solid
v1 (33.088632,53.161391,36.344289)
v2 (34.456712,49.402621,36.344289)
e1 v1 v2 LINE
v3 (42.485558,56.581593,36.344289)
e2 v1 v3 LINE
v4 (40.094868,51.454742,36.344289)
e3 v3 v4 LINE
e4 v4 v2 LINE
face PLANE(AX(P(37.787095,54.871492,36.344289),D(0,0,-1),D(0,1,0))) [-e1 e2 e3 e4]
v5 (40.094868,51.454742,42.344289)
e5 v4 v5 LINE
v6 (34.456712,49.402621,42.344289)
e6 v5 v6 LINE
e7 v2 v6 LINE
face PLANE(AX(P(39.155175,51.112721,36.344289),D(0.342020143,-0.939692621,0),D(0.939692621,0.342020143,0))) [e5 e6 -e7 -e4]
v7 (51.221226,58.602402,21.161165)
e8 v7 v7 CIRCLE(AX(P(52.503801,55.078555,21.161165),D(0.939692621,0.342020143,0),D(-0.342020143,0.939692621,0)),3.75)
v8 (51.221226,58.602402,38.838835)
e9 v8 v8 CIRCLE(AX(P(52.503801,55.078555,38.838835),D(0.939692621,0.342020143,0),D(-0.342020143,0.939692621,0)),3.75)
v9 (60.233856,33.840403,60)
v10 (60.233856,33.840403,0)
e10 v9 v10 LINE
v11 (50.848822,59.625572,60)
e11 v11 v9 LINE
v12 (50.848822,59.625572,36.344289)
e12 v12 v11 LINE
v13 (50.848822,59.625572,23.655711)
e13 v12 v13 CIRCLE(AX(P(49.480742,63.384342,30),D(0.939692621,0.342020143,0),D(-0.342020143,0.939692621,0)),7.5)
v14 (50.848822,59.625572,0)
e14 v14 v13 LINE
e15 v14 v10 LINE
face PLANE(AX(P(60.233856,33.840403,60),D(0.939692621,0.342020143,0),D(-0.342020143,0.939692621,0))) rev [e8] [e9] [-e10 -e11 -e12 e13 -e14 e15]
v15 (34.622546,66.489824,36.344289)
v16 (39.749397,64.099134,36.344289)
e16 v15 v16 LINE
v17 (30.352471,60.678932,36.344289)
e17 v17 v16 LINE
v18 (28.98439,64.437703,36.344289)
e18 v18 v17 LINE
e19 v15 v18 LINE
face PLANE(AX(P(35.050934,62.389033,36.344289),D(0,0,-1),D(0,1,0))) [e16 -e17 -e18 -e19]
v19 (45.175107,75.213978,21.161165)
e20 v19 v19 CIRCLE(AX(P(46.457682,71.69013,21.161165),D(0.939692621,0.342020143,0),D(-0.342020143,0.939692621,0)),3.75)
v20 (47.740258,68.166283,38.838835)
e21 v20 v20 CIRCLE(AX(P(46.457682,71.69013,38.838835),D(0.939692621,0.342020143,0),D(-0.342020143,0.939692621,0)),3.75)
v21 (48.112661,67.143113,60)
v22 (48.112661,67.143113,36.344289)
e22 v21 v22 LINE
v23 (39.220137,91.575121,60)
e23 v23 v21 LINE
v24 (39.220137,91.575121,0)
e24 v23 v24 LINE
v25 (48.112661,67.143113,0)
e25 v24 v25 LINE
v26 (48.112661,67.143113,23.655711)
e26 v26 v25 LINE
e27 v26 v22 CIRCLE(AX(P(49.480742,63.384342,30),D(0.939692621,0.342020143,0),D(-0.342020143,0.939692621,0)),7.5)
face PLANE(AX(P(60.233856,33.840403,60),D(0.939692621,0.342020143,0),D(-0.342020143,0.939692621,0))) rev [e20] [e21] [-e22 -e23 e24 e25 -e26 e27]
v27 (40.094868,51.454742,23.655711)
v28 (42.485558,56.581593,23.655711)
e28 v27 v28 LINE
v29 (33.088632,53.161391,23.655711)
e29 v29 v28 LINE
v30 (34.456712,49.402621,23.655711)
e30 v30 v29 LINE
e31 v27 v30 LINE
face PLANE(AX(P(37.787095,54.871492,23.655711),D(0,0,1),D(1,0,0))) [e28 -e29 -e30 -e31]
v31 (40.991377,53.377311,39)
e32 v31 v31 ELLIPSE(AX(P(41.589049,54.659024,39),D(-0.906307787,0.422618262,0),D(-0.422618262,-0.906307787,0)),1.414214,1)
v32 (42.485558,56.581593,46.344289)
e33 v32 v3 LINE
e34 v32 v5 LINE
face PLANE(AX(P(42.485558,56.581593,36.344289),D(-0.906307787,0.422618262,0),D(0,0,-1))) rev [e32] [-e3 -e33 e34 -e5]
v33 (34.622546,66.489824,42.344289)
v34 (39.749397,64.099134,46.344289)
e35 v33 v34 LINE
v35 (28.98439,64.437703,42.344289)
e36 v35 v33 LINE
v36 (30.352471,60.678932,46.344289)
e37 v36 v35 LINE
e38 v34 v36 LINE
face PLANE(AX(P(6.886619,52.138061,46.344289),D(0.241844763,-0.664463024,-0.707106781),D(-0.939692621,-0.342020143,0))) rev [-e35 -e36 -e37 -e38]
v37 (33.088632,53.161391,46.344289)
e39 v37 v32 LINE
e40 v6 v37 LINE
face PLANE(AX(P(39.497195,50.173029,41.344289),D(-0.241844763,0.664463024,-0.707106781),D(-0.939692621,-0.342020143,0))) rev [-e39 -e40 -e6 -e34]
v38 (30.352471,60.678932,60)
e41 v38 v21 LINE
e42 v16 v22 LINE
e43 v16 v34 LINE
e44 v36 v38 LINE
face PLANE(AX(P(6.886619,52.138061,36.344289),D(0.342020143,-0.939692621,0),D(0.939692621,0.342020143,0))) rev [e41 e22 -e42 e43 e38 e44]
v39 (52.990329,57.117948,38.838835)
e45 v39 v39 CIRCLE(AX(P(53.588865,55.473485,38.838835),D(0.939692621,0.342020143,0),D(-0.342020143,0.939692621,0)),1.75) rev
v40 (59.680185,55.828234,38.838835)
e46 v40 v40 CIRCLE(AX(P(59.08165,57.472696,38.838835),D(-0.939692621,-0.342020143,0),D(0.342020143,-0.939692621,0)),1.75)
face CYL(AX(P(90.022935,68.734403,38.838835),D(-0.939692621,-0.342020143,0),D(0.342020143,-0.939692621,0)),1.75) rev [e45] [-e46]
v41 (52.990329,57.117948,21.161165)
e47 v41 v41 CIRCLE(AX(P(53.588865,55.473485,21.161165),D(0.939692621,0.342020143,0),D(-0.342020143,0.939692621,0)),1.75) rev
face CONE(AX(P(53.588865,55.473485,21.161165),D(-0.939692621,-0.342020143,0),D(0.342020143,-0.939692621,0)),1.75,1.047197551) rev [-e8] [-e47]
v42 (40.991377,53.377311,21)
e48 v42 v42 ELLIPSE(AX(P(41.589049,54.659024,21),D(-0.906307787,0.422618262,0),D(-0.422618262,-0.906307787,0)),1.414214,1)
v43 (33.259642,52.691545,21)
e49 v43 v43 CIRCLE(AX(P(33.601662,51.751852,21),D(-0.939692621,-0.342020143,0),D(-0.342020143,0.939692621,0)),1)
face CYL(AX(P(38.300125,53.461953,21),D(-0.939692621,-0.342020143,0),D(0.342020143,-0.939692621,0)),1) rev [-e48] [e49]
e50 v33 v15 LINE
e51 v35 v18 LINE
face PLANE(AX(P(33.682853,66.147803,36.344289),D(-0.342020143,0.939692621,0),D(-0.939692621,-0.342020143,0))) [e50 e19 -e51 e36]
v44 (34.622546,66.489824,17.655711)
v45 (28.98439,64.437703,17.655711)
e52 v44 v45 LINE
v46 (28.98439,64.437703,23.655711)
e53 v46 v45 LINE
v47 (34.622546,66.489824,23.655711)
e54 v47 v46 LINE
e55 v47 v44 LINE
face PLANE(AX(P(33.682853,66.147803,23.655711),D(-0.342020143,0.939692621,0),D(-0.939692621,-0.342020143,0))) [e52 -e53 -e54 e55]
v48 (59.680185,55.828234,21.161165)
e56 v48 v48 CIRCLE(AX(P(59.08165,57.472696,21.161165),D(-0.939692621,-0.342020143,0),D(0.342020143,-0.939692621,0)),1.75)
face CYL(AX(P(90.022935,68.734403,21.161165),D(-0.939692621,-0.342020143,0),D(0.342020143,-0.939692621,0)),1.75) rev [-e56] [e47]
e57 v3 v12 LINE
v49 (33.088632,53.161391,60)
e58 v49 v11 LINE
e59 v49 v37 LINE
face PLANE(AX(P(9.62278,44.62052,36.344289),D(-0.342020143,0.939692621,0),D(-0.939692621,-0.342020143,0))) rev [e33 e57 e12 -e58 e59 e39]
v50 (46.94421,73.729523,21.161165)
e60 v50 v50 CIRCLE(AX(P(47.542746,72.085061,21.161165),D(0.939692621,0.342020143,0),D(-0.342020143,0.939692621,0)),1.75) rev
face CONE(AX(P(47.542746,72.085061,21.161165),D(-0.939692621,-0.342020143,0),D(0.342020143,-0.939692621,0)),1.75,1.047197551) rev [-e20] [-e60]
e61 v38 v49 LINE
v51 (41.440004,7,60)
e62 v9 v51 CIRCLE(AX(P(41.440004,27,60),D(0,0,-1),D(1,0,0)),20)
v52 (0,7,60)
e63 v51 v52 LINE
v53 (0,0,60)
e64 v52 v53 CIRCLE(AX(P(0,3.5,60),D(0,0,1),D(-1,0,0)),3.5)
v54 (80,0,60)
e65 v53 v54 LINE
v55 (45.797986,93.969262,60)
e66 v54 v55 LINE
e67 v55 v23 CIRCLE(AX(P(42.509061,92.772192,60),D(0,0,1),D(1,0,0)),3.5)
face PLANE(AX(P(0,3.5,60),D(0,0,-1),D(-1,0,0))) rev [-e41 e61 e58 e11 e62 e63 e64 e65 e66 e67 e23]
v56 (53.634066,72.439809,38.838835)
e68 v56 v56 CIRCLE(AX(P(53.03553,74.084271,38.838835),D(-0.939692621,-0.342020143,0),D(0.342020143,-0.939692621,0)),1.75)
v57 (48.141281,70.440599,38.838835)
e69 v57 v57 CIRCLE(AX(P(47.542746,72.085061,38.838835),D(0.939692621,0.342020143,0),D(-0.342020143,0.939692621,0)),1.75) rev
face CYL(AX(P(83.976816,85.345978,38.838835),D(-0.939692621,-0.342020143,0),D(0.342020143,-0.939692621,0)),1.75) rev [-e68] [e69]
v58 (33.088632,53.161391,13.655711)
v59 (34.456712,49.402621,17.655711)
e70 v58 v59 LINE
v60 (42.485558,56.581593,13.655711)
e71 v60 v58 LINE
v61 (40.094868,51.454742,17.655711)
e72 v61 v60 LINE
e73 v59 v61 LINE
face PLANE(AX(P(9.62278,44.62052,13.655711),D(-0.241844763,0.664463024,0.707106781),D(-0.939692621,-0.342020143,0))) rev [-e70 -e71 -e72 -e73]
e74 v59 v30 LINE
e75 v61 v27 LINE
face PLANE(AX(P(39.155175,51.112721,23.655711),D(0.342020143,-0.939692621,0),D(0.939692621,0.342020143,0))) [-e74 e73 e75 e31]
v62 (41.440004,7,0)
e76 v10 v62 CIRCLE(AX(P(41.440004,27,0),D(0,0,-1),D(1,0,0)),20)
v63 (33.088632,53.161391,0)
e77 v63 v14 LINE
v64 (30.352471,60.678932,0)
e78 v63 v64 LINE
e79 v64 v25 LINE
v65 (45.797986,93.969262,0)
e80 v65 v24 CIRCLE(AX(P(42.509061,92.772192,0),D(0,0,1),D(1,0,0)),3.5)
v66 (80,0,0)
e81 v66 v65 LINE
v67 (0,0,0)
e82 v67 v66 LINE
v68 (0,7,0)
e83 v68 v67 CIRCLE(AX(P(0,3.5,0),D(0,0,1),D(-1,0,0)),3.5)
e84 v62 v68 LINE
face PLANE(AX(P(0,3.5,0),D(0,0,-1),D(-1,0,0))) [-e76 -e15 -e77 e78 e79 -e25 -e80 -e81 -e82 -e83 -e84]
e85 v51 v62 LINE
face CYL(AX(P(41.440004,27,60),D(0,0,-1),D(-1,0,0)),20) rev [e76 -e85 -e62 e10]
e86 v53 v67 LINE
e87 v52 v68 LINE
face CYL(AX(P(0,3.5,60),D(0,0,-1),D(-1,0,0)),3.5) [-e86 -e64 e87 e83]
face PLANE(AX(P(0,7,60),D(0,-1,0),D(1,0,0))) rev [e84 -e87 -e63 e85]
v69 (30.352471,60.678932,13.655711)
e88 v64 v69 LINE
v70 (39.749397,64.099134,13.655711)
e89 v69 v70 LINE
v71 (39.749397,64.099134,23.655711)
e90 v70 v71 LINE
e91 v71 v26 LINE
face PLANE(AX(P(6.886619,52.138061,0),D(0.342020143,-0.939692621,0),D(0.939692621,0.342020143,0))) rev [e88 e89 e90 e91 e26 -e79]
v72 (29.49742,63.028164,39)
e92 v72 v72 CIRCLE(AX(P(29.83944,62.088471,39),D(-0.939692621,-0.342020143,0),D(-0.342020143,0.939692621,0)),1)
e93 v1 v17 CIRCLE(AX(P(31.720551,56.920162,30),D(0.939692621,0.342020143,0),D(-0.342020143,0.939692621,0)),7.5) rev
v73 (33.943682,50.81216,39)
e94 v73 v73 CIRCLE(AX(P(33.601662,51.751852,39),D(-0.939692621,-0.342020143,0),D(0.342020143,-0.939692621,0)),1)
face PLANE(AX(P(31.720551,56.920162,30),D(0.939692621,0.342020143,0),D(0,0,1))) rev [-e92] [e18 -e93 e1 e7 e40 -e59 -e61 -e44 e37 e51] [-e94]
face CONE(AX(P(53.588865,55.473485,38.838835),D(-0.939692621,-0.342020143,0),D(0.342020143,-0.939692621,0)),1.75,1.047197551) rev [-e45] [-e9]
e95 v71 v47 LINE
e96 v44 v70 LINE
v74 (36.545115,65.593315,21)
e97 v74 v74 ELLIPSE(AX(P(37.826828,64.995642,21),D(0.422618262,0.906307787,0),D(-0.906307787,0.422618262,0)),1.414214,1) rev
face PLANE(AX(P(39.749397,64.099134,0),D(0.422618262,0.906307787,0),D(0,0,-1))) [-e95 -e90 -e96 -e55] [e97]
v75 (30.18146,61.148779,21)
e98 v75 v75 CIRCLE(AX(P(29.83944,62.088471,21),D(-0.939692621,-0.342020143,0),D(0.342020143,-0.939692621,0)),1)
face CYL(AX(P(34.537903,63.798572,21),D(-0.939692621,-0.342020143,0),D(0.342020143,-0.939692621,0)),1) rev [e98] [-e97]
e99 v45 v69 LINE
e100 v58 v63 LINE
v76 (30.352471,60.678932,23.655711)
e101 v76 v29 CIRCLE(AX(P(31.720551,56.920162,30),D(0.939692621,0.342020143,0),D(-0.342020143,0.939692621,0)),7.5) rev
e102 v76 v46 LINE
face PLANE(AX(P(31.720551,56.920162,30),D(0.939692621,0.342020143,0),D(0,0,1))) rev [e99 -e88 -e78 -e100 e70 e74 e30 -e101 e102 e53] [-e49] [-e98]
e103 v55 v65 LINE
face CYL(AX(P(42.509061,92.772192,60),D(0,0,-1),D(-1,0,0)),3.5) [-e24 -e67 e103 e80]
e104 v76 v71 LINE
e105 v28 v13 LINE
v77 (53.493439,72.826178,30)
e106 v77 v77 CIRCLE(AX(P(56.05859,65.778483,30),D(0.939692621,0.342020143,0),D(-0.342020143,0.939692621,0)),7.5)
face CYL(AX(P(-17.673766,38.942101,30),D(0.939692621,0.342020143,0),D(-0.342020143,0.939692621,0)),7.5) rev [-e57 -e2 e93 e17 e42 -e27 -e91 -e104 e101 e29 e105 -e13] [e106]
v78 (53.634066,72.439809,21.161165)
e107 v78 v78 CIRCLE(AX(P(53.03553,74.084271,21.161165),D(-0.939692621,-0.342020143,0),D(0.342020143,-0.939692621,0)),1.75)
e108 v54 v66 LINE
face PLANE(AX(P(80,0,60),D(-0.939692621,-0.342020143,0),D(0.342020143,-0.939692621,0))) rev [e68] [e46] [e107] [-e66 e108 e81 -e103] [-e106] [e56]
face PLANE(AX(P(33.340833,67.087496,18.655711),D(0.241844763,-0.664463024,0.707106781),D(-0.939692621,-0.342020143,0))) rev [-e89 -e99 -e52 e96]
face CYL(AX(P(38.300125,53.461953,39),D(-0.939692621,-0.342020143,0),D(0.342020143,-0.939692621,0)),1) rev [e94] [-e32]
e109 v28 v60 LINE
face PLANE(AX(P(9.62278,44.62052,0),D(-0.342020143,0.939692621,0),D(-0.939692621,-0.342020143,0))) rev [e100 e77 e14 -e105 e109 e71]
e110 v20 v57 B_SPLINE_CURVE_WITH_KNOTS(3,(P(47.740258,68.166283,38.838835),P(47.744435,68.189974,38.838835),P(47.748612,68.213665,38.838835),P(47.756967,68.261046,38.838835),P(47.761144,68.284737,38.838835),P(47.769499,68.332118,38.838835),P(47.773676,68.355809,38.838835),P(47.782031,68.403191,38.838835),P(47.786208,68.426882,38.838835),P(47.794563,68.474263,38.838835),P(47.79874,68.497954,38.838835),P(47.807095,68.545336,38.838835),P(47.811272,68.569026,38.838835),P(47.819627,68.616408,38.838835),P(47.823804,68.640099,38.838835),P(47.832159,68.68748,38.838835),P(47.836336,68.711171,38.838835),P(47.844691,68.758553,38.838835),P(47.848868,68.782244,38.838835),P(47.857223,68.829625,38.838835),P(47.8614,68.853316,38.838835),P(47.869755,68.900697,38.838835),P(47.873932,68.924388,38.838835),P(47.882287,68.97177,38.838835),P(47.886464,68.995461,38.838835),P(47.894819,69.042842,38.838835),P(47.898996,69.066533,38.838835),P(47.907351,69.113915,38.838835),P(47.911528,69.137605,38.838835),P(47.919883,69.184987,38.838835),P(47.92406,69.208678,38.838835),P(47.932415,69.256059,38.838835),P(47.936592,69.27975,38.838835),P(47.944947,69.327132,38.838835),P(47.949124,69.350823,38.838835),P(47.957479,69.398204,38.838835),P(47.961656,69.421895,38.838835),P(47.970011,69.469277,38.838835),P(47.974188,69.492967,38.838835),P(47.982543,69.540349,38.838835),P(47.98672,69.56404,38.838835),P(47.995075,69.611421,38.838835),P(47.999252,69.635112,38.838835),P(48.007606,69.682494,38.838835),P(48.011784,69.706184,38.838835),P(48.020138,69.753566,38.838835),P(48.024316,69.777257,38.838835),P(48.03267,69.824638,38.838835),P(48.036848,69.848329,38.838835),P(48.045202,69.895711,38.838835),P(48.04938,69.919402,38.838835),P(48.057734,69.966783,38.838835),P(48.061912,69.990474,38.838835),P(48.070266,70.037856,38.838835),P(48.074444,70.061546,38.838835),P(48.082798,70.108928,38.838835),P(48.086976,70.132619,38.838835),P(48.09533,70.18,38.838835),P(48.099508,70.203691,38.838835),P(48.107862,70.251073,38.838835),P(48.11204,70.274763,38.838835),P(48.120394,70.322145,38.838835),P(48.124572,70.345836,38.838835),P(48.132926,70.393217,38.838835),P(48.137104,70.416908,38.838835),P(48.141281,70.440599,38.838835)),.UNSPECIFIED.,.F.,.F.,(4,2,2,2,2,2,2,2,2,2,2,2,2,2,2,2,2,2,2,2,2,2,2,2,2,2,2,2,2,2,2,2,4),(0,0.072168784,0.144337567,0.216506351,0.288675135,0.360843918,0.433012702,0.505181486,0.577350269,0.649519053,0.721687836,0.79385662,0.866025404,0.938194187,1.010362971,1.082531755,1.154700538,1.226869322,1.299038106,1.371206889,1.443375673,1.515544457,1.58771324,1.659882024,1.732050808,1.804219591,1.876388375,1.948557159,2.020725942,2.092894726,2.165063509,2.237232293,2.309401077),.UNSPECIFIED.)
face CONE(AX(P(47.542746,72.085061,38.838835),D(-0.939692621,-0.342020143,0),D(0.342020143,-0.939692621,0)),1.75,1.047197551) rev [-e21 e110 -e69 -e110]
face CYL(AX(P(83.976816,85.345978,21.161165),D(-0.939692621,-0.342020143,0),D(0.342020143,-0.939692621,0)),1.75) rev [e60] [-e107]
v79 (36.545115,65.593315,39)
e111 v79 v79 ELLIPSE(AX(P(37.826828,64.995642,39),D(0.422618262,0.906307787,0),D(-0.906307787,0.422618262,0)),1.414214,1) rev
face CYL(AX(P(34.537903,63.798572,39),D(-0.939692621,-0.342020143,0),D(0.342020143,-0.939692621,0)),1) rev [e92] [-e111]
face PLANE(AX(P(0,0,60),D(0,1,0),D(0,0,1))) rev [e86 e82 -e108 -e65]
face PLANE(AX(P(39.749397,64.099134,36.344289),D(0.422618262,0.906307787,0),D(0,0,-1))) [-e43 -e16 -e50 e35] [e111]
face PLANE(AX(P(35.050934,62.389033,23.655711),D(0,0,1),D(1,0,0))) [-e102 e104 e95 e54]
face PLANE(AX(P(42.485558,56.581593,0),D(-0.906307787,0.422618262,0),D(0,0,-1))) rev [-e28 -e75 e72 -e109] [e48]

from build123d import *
from build123d.topology import SkipClean

# Parameters (mm, degrees)
BOSS_EXTRUDE1_DEPTH = 60
SKETCH2_R           = 7.5
CUT_EXTRUDE1_DEPTH  = 119.641534805
SKETCH3_R           = 1.75
CUT_EXTRUDE2_DEPTH  = 117.134798875
CHAMFER1_SIZE       = 2
CHAMFER1_SIZE2      = 1.154700538
BOSS_EXTRUDE2_DEPTH = 18.9
SKETCH5_W           = 5
SKETCH5_H           = 4
SKETCH5_R           = 1
BOSS_EXTRUDE3_DEPTH = 5
CHAMFER2_SIZE       = 5


with BuildPart() as part:
    # Sketch1 → Boss-Extrude1 (new body)
    with BuildSketch(Plane.XY):
        with BuildLine():
            Line((0, 0), (80, 0))
            Line((80, 0), (45.797985667, 93.969262079))
            ThreePointArc((45.797985667, 93.969262079), (41.311990993, 96.06111575), (39.220137322, 91.575121075))
            Line((39.220137322, 91.575121075), (60.233856234, 33.840402867))
            ThreePointArc((60.233856234, 33.840402867), (57.823044704, 15.528471273), (41.440003818, 7))
            Line((41.440003818, 7), (0, 7))
            ThreePointArc((0, 7), (-3.5, 3.5), (0, 0))
        make_face()
    extrude(amount=BOSS_EXTRUDE1_DEPTH)

    # Sketch2 → Cut-Extrude1 (cut, through all)
    with BuildSketch(Plane(origin=(70.641777725, 25.711504387, 0), x_dir=(0, 0, -1), z_dir=(0.9396926207859069, 0.3420201433256728, 0))):
        with Locations(Location((-30, 42.638388534, 0), (0, 0, 90))):
            Circle(SKETCH2_R)
    extrude(amount=-CUT_EXTRUDE1_DEPTH, mode=Mode.SUBTRACT)

    # Sketch3 → Cut-Extrude2 (cut, through all)
    with BuildSketch(Plane(origin=(64.063929379, 23.317363384, 0), x_dir=(0, 0, 1), z_dir=(-0.9396926207859071, -0.3420201433256726, 0))):
        with Locations(Location((21.161165235, 33.799553769, 0), (0, 0, 270))):
            Circle(SKETCH3_R)
        with Locations(Location((21.161165235, 51.477223299, 0), (0, 0, 270))):
            Circle(SKETCH3_R)
        with Locations(Location((38.838834765, 51.477223299, 0), (0, 0, 270))):
            Circle(SKETCH3_R)
        with Locations(Location((38.838834765, 33.799553769, 0), (0, 0, 270))):
            Circle(SKETCH3_R)
    extrude(amount=-CUT_EXTRUDE2_DEPTH, mode=Mode.SUBTRACT)

    # Chamfer1
    chamfer1_edges = [part.edges().sort_by_distance(p)[0] for p in [
        (45.859146838, 73.334592343, 21.161165235),
        (45.859146838, 73.334592343, 38.838834765),
        (51.905265904, 56.723016733, 38.838834765),
        (51.905265904, 56.723016733, 21.161165235),
    ]]
    chamfer1_side = [part.faces().sort_by_distance(p)[0] for p in [
        (39.513854258, 90.768140426, 30),
    ]]
    chamfer(chamfer1_edges, length=CHAMFER1_SIZE, length2=CHAMFER1_SIZE2, reference=chamfer1_side[0])

    # Sketch4 → Boss-Extrude2 (add)
    with SkipClean():  # the faces are left unmerged after this step: merging them gives an invalid solid
        with BuildSketch(Plane(origin=(64.063929379, 23.317363384, 0), x_dir=(0, 0, 1), z_dir=(-0.9396926207859071, -0.3420201433256726, 0))):
            with BuildLine():
                Line((36.34428877, 46.638388534), (60, 46.638388534))
                Line((60, 46.638388534), (60, 38.638388534))
                Line((60, 38.638388534), (36.34428877, 38.638388534))
                ThreePointArc((36.34428877, 38.638388534), (37.5, 42.638388534), (36.34428877, 46.638388534))
            make_face()
            with BuildLine():
                Line((0, 38.638388534), (23.65571123, 38.638388534))
                ThreePointArc((23.65571123, 38.638388534), (22.5, 42.638388534), (23.65571123, 46.638388534))
                Line((23.65571123, 46.638388534), (0, 46.638388534))
                Line((0, 46.638388534), (0, 38.638388534))
            make_face()
        extrude(amount=BOSS_EXTRUDE2_DEPTH)

    # Sketch5 → Boss-Extrude3 (add)
    # profile 1 of 4: a face of its own
    with SkipClean():  # the faces are left unmerged after this step: merging them gives an invalid solid
        with BuildSketch(Plane(origin=(46.303738846, 16.853182675, 0), x_dir=(0, 0, 1), z_dir=(-0.9396926207859069, -0.3420201433256728, 0))):
            with Locations((21.15571123, 48.638388534)):
                Rectangle(SKETCH5_W, SKETCH5_H)
            with Locations(Location((21, 48.138388534, 0), (0, 0, 270))):
                Circle(SKETCH5_R, mode=Mode.SUBTRACT)
        # profile 2 of 4: a face of its own
        with BuildSketch(Plane(origin=(46.303738846, 16.853182675, 0), x_dir=(0, 0, 1), z_dir=(-0.9396926207859069, -0.3420201433256728, 0))):
            with Locations((38.84428877, 48.638388534)):
                Rectangle(SKETCH5_W, SKETCH5_H)
            with Locations(Location((39, 48.138388534, 0), (0, 0, 90))):
                Circle(SKETCH5_R, mode=Mode.SUBTRACT)
        # profile 3 of 4: a face of its own
        with BuildSketch(Plane(origin=(46.303738846, 16.853182675, 0), x_dir=(0, 0, 1), z_dir=(-0.9396926207859069, -0.3420201433256728, 0))):
            with Locations((38.84428877, 36.638388534)):
                Rectangle(SKETCH5_W, SKETCH5_H)
            with Locations(Location((39, 37.138388534, 0), (0, 0, 270))):
                Circle(SKETCH5_R, mode=Mode.SUBTRACT)
        # profile 4 of 4: a face of its own
        with BuildSketch(Plane(origin=(46.303738846, 16.853182675, 0), x_dir=(0, 0, 1), z_dir=(-0.9396926207859069, -0.3420201433256728, 0))):
            with Locations((21.15571123, 36.638388534)):
                Rectangle(SKETCH5_W, SKETCH5_H)
            with Locations(Location((21, 37.138388534, 0), (0, 0, 90))):
                Circle(SKETCH5_R, mode=Mode.SUBTRACT)
        extrude(amount=-BOSS_EXTRUDE3_DEPTH)

    # Chamfer2
    # the kernel refuses this chamfer: 5 mm, written as the material it adds along each edge
    with BuildSketch(Plane(origin=(37.787094766, 54.871491976, 23.48587383), x_dir=(0.9299331952381907, 0.3677285036464934, 0), z_dir=(0, 0, 1))) as chamfer2_piece_1_section:
        Polygon((CHAMFER2_SIZE * 0.999621916911, -CHAMFER2_SIZE * 0.0274958766106), (-CHAMFER2_SIZE * 0.0274958766106, -CHAMFER2_SIZE * 0.999621916911), (0, 0), align=None)
    chamfer2_piece_1 = extrude(amount=17.85841494, mode=Mode.PRIVATE)
    chamfer2_piece_1 = chamfer2_piece_1 - Plane(origin=(38.02216053, 59.213760007, 30), x_dir=(0.18241074310702424, -0.5011693977524806, -0.8459051693633035), z_dir=(0.9396926207859071, 0.34202014332567265, 0)) * Cylinder(7.5, 56, mode=Mode.PRIVATE)
    chamfer2_piece_1 = split(chamfer2_piece_1, bisect_by=Plane(origin=(39.909169975, 54.029244166, 23.65571123), z_dir=(0, 0, -1)), keep=Keep.TOP, mode=Mode.PRIVATE)
    chamfer2_piece_1 = split(chamfer2_piece_1, bisect_by=Plane(origin=(40.758321676, 51.696219041, 23.570135946), z_dir=(-0.3420201433256728, 0.9396926207859069, 0)), keep=Keep.TOP, mode=Mode.PRIVATE)
    add(chamfer2_piece_1)
    with BuildSketch(Plane(origin=(37.787094766, 54.871491976, 36.34428877), x_dir=(0.9299331952381793, 0.3677285036465222, 0), z_dir=(0, 0, 1))) as chamfer2_piece_2_section:
        Polygon((CHAMFER2_SIZE * 0.999621916911, -CHAMFER2_SIZE * 0.0274958766106), (-CHAMFER2_SIZE * 0.0274958766106, -CHAMFER2_SIZE * 0.999621916911), (0, 0), align=None)
    chamfer2_piece_2 = extrude(amount=5, mode=Mode.PRIVATE)
    chamfer2_piece_2 = chamfer2_piece_2 - Plane(origin=(40.576659633, 60.143521644, 30), x_dir=(0.18241074310702424, -0.5011693977524806, -0.8459051693633035), z_dir=(0.9396926207859071, 0.34202014332567265, 0)) * Cylinder(7.5, 30, mode=Mode.PRIVATE)
    chamfer2_piece_2 = split(chamfer2_piece_2, bisect_by=Plane(origin=(43.312820779, 52.625980678, 40.510955437), z_dir=(-0.3420201433256728, 0.9396926207859069, 0)), keep=Keep.TOP, mode=Mode.PRIVATE)
    chamfer2_piece_2 = chamfer2_piece_2 - Plane(origin=(42.457770421, 54.97521223, 39), x_dir=(0.3420201433256728, -0.9396926207859069, 0), z_dir=(-0.9396926207859069, -0.3420201433256728, 0)) * Cylinder(1, 30, mode=Mode.PRIVATE)
    add(chamfer2_piece_2)
    with BuildSketch(Plane(origin=(33.088631662, 53.16139126, 41.34428877), x_dir=(-0.00940414365922947, 0.02583767235303998, 0.9996219169112959), z_dir=(0.9396926207859069, 0.3420201433256728, 0))) as chamfer2_piece_3_section:
        Polygon((CHAMFER2_SIZE * 0.999621916911, CHAMFER2_SIZE * 0.0274958766106), (-CHAMFER2_SIZE * 0.0274958766106, CHAMFER2_SIZE * 0.999621916911), (0, 0), align=None)
    chamfer2_piece_3 = extrude(amount=5, mode=Mode.PRIVATE)
    chamfer2_piece_3 = split(chamfer2_piece_3, bisect_by=Plane(origin=(36.805943787, 50.257671135, 43.072880832), z_dir=(-0.3420201433256728, 0.9396926207859069, 1.4210854715202e-15)), keep=Keep.TOP, mode=Mode.PRIVATE)
    add(chamfer2_piece_3)
    with BuildSketch(Plane(origin=(37.787094766, 54.871491976, 36.51412617), x_dir=(0.9299331952381907, 0.3677285036464934, 0), z_dir=(0, 0, -1))) as chamfer2_piece_4_section:
        Polygon((CHAMFER2_SIZE * 0.999621916911, CHAMFER2_SIZE * 0.0274958766106), (-CHAMFER2_SIZE * 0.0274958766106, CHAMFER2_SIZE * 0.999621916911), (0, 0), align=None)
    chamfer2_piece_4 = extrude(amount=17.85841494, mode=Mode.PRIVATE)
    chamfer2_piece_4 = chamfer2_piece_4 - Plane(origin=(38.022160531, 59.213760008, 30), x_dir=(0.18241074310702424, -0.5011693977524806, -0.8459051693633035), z_dir=(0.9396926207859071, 0.34202014332567265, 0)) * Cylinder(7.5, 56, mode=Mode.PRIVATE)
    chamfer2_piece_4 = split(chamfer2_piece_4, bisect_by=Plane(origin=(39.909169977, 54.029244164, 36.34428877), z_dir=(0, 0, 1)), keep=Keep.TOP, mode=Mode.PRIVATE)
    chamfer2_piece_4 = split(chamfer2_piece_4, bisect_by=Plane(origin=(40.758321677, 51.696219041, 36.429864054), z_dir=(-0.3420201433256728, 0.9396926207859069, 0)), keep=Keep.TOP, mode=Mode.PRIVATE)
    add(chamfer2_piece_4)
    with BuildSketch(Plane(origin=(37.787094766, 54.871491976, 23.65571123), x_dir=(0.9299331952381796, 0.36772850364652154, 0), z_dir=(0, 0, -1))) as chamfer2_piece_5_section:
        Polygon((CHAMFER2_SIZE * 0.999621916911, CHAMFER2_SIZE * 0.0274958766106), (-CHAMFER2_SIZE * 0.0274958766106, CHAMFER2_SIZE * 0.999621916911), (0, 0), align=None)
    chamfer2_piece_5 = extrude(amount=5, mode=Mode.PRIVATE)
    chamfer2_piece_5 = chamfer2_piece_5 - Plane(origin=(40.576659674, 60.143521659, 30), x_dir=(0.18241074310702424, -0.5011693977524806, -0.8459051693633035), z_dir=(0.9396926207859071, 0.34202014332567265, 0)) * Cylinder(7.5, 30, mode=Mode.PRIVATE)
    chamfer2_piece_5 = split(chamfer2_piece_5, bisect_by=Plane(origin=(43.31282082, 52.625980693, 19.489044563), z_dir=(-0.3420201433256728, 0.9396926207859069, 0)), keep=Keep.TOP, mode=Mode.PRIVATE)
    chamfer2_piece_5 = chamfer2_piece_5 - Plane(origin=(42.457770462, 54.975212245, 21), x_dir=(-0.3420201433256728, 0.9396926207859069, 0), z_dir=(-0.9396926207859069, -0.3420201433256728, 0)) * Cylinder(1, 30, mode=Mode.PRIVATE)
    add(chamfer2_piece_5)
    with BuildSketch(Plane(origin=(33.088631662, 53.16139126, 18.65571123), x_dir=(-0.009404143659228424, 0.02583767235303711, -0.9996219169112959), z_dir=(0.9396926207859069, 0.3420201433256728, 0))) as chamfer2_piece_6_section:
        Polygon((CHAMFER2_SIZE * 0.999621916911, -CHAMFER2_SIZE * 0.0274958766106), (-CHAMFER2_SIZE * 0.0274958766106, -CHAMFER2_SIZE * 0.999621916911), (0, 0), align=None)
    chamfer2_piece_6 = extrude(amount=5, mode=Mode.PRIVATE)
    chamfer2_piece_6 = split(chamfer2_piece_6, bisect_by=Plane(origin=(36.805943787, 50.257671135, 16.927119168), z_dir=(-0.3420201433256728, 0.9396926207859069, 0)), keep=Keep.TOP, mode=Mode.PRIVATE)
    add(chamfer2_piece_6)
    with BuildSketch(Plane(origin=(30.352470516, 60.678932226, 18.65571123), x_dir=(0.009404143659218054, -0.025837672353008618, -0.9996219169112968), z_dir=(0.9396926207859069, 0.3420201433256728, 0))) as chamfer2_piece_7_section:
        Polygon((CHAMFER2_SIZE * 0.999621916911, CHAMFER2_SIZE * 0.0274958766106), (-CHAMFER2_SIZE * 0.0274958766106, CHAMFER2_SIZE * 0.999621916911), (0, 0), align=None)
    chamfer2_piece_7 = extrude(amount=5, mode=Mode.PRIVATE)
    chamfer2_piece_7 = split(chamfer2_piece_7, bisect_by=Plane(origin=(31.333621494, 65.292753067, 16.927119168), z_dir=(0.3420201433256728, -0.9396926207859069, 0)), keep=Keep.TOP, mode=Mode.PRIVATE)
    add(chamfer2_piece_7)
    with BuildSketch(Plane(origin=(35.050933619, 62.389032943, 36.51412617), x_dir=(0.9487414825566265, 0.3160531589404771, 0), z_dir=(0, 0, -1))) as chamfer2_piece_8_section:
        Polygon((CHAMFER2_SIZE * 0.999621916911, -CHAMFER2_SIZE * 0.0274958766106), (-CHAMFER2_SIZE * 0.0274958766106, -CHAMFER2_SIZE * 0.999621916911), (0, 0), align=None)
    chamfer2_piece_8 = extrude(amount=17.85841494, mode=Mode.PRIVATE)
    chamfer2_piece_8 = chamfer2_piece_8 - Plane(origin=(38.02216053, 59.213760007, 30), x_dir=(0.18241074310702424, -0.5011693977524806, -0.8459051693633035), z_dir=(0.9396926207859071, 0.34202014332567265, 0)) * Cylinder(7.5, 56, mode=Mode.PRIVATE)
    chamfer2_piece_8 = split(chamfer2_piece_8, bisect_by=Plane(origin=(35.285999383, 66.731300974, 36.429864054), z_dir=(0.3420201433256728, -0.9396926207859069, 0)), keep=Keep.TOP, mode=Mode.PRIVATE)
    chamfer2_piece_8 = split(chamfer2_piece_8, bisect_by=Plane(origin=(36.135151084, 64.398275849, 36.34428877), z_dir=(0, 0, 1)), keep=Keep.TOP, mode=Mode.PRIVATE)
    add(chamfer2_piece_8)
    with BuildSketch(Plane(origin=(35.050933619, 62.389032943, 23.65571123), x_dir=(0.9487414825566265, 0.3160531589404771, 0), z_dir=(0, 0, -1))) as chamfer2_piece_9_section:
        Polygon((CHAMFER2_SIZE * 0.999621916911, -CHAMFER2_SIZE * 0.0274958766106), (-CHAMFER2_SIZE * 0.0274958766106, -CHAMFER2_SIZE * 0.999621916911), (0, 0), align=None)
    chamfer2_piece_9 = extrude(amount=5, mode=Mode.PRIVATE)
    chamfer2_piece_9 = chamfer2_piece_9 - Plane(origin=(40.576659674, 60.143521659, 30), x_dir=(0.18241074310702424, -0.5011693977524806, -0.8459051693633035), z_dir=(0.9396926207859071, 0.34202014332567265, 0)) * Cylinder(7.5, 30, mode=Mode.PRIVATE)
    chamfer2_piece_9 = split(chamfer2_piece_9, bisect_by=Plane(origin=(37.840498527, 67.661062625, 19.489044563), z_dir=(0.3420201433256728, -0.9396926207859069, 0)), keep=Keep.TOP, mode=Mode.PRIVATE)
    chamfer2_piece_9 = chamfer2_piece_9 - Plane(origin=(38.695548885, 65.311831073, 21), x_dir=(0.3420201433256728, -0.9396926207859069, 0), z_dir=(-0.9396926207859069, -0.3420201433256728, 0)) * Cylinder(1, 30, mode=Mode.PRIVATE)
    add(chamfer2_piece_9)
    with BuildSketch(Plane(origin=(35.050933619, 62.389032943, 41.34428877), x_dir=(0.9487414825566282, 0.3160531589404717, 0), z_dir=(0, 0, -1))) as chamfer2_piece_10_section:
        Polygon((CHAMFER2_SIZE * 0.999621916911, -CHAMFER2_SIZE * 0.0274958766106), (-CHAMFER2_SIZE * 0.0274958766106, -CHAMFER2_SIZE * 0.999621916911), (0, 0), align=None)
    chamfer2_piece_10 = extrude(amount=5, mode=Mode.PRIVATE)
    chamfer2_piece_10 = chamfer2_piece_10 - Plane(origin=(40.576659633, 60.143521644, 30), x_dir=(0.18241074310702424, -0.5011693977524806, -0.8459051693633035), z_dir=(0.9396926207859071, 0.34202014332567265, 0)) * Cylinder(7.5, 30, mode=Mode.PRIVATE)
    chamfer2_piece_10 = split(chamfer2_piece_10, bisect_by=Plane(origin=(37.840498486, 67.661062611, 37.177622104), z_dir=(0.3420201433256728, -0.9396926207859069, 0)), keep=Keep.TOP, mode=Mode.PRIVATE)
    chamfer2_piece_10 = chamfer2_piece_10 - Plane(origin=(38.695548844, 65.311831059, 39), x_dir=(-0.3420201433256728, 0.9396926207859069, 0), z_dir=(-0.9396926207859069, -0.3420201433256728, 0)) * Cylinder(1, 30, mode=Mode.PRIVATE)
    add(chamfer2_piece_10)
    with BuildSketch(Plane(origin=(35.050933619, 62.389032943, 41.34428877), x_dir=(0.9487414825566282, 0.3160531589404717, 0), z_dir=(0, 0, -1))) as chamfer2_piece_11_section:
        Polygon((CHAMFER2_SIZE * 0.999621916911, -CHAMFER2_SIZE * 0.0274958766106), (-CHAMFER2_SIZE * 0.0274958766106, -CHAMFER2_SIZE * 0.999621916911), (0, 0), align=None)
    chamfer2_piece_11 = extrude(amount=17.85841494, mode=Mode.PRIVATE)
    chamfer2_piece_11 = chamfer2_piece_11 - Plane(origin=(38.022160531, 59.213760008, 30), x_dir=(0.18241074310702424, -0.5011693977524806, -0.8459051693633035), z_dir=(0.9396926207859071, 0.34202014332567265, 0)) * Cylinder(7.5, 56, mode=Mode.PRIVATE)
    chamfer2_piece_11 = split(chamfer2_piece_11, bisect_by=Plane(origin=(35.285999384, 66.731300974, 23.570135946), z_dir=(0.3420201433256728, -0.9396926207859069, 0)), keep=Keep.TOP, mode=Mode.PRIVATE)
    chamfer2_piece_11 = split(chamfer2_piece_11, bisect_by=Plane(origin=(36.135151085, 64.398275851, 23.65571123), z_dir=(0, 0, -1)), keep=Keep.TOP, mode=Mode.PRIVATE)
    add(chamfer2_piece_11)
    with BuildSketch(Plane(origin=(30.352470516, 60.678932226, 41.34428877), x_dir=(0.009404143659219547, -0.025837672353012715, 0.9996219169112965), z_dir=(0.9396926207859069, 0.3420201433256728, 0))) as chamfer2_piece_12_section:
        Polygon((CHAMFER2_SIZE * 0.999621916911, -CHAMFER2_SIZE * 0.0274958766106), (-CHAMFER2_SIZE * 0.0274958766106, -CHAMFER2_SIZE * 0.999621916911), (0, 0), align=None)
    chamfer2_piece_12 = extrude(amount=5, mode=Mode.PRIVATE)
    chamfer2_piece_12 = split(chamfer2_piece_12, bisect_by=Plane(origin=(31.333621494, 65.292753067, 43.072880832), z_dir=(0.3420201433256728, -0.9396926207859069, 1.4210854715202e-15)), keep=Keep.TOP, mode=Mode.PRIVATE)
    add(chamfer2_piece_12)
    with BuildSketch(Plane(origin=(37.787094766, 54.871491976, 36.34428877), x_dir=(0.9299331952381793, 0.3677285036465222, 0), z_dir=(0, 0, 1))) as chamfer2_piece_13a_section:
        Polygon((CHAMFER2_SIZE * 0.999621916911, -CHAMFER2_SIZE * 0.0274958766106), (-CHAMFER2_SIZE * 0.0274958766106, -CHAMFER2_SIZE * 0.999621916911), (0, 0), align=None)
    chamfer2_piece_13a = extrude(amount=17.85841494, mode=Mode.PRIVATE)
    chamfer2_piece_13a = split(chamfer2_piece_13a, bisect_by=Plane(origin=(40.779520544, 51.703934798, 47.77349624), z_dir=(-0.3420201433256728, 0.9396926207859069, 0)), keep=Keep.TOP, mode=Mode.PRIVATE)
    chamfer2_piece_13a = split(chamfer2_piece_13a, bisect_by=Plane(origin=(39.923484947, 54.05587327, 41.34428877), z_dir=(0, 0, 1)), keep=Keep.TOP, mode=Mode.PRIVATE)
    with BuildSketch(Plane(origin=(33.088631662, 53.16139126, 41.34428877), x_dir=(-0.00940414365922947, 0.02583767235303998, 0.9996219169112959), z_dir=(0.9396926207859069, 0.3420201433256728, 0))) as chamfer2_piece_13b_section:
        Polygon((CHAMFER2_SIZE * 0.999621916911, CHAMFER2_SIZE * 0.0274958766106), (-CHAMFER2_SIZE * 0.0274958766106, CHAMFER2_SIZE * 0.999621916911), (0, 0), align=None)
    chamfer2_piece_13b = extrude(amount=17.85841494, mode=Mode.PRIVATE)
    chamfer2_piece_13b = split(chamfer2_piece_13b, bisect_by=Plane(origin=(38.299139743, 53.464659965, 43.072880832), z_dir=(0.9396926207859069, 0.3420201433256728, 0)), keep=Keep.TOP, mode=Mode.PRIVATE)
    chamfer2_piece_13b = split(chamfer2_piece_13b, bisect_by=Plane(origin=(45.196654156, 53.311639954, 43.072880832), z_dir=(-0.3420201433256728, 0.9396926207859069, 1.4210854715202e-15)), keep=Keep.TOP, mode=Mode.PRIVATE)
    chamfer2_piece_13 = chamfer2_piece_13a & chamfer2_piece_13b
    add(chamfer2_piece_13)
    with BuildSketch(Plane(origin=(37.787094766, 54.871491976, 23.65571123), x_dir=(0.9299331952381796, 0.36772850364652154, 0), z_dir=(0, 0, -1))) as chamfer2_piece_14a_section:
        Polygon((CHAMFER2_SIZE * 0.999621916911, CHAMFER2_SIZE * 0.0274958766106), (-CHAMFER2_SIZE * 0.0274958766106, CHAMFER2_SIZE * 0.999621916911), (0, 0), align=None)
    chamfer2_piece_14a = extrude(amount=17.85841494, mode=Mode.PRIVATE)
    chamfer2_piece_14a = split(chamfer2_piece_14a, bisect_by=Plane(origin=(39.923484947, 54.05587327, 18.65571123), z_dir=(0, 0, -1)), keep=Keep.TOP, mode=Mode.PRIVATE)
    chamfer2_piece_14a = split(chamfer2_piece_14a, bisect_by=Plane(origin=(40.779520544, 51.703934798, 12.22650376), z_dir=(-0.3420201433256728, 0.9396926207859069, 0)), keep=Keep.TOP, mode=Mode.PRIVATE)
    with BuildSketch(Plane(origin=(33.088631662, 53.16139126, 18.65571123), x_dir=(-0.009404143659228424, 0.02583767235303711, -0.9996219169112959), z_dir=(0.9396926207859069, 0.3420201433256728, 0))) as chamfer2_piece_14b_section:
        Polygon((CHAMFER2_SIZE * 0.999621916911, -CHAMFER2_SIZE * 0.0274958766106), (-CHAMFER2_SIZE * 0.0274958766106, -CHAMFER2_SIZE * 0.999621916911), (0, 0), align=None)
    chamfer2_piece_14b = extrude(amount=17.85841494, mode=Mode.PRIVATE)
    chamfer2_piece_14b = split(chamfer2_piece_14b, bisect_by=Plane(origin=(38.299139743, 53.464659965, 16.927119168), z_dir=(0.9396926207859069, 0.3420201433256728, 0)), keep=Keep.TOP, mode=Mode.PRIVATE)
    chamfer2_piece_14b = split(chamfer2_piece_14b, bisect_by=Plane(origin=(45.196654156, 53.311639954, 16.927119168), z_dir=(-0.3420201433256728, 0.9396926207859069, 0)), keep=Keep.TOP, mode=Mode.PRIVATE)
    chamfer2_piece_14 = chamfer2_piece_14a & chamfer2_piece_14b
    add(chamfer2_piece_14)
    with BuildSketch(Plane(origin=(30.352470516, 60.678932226, 18.65571123), x_dir=(0.009404143659218054, -0.025837672353008618, -0.9996219169112968), z_dir=(0.9396926207859069, 0.3420201433256728, 0))) as chamfer2_piece_15a_section:
        Polygon((CHAMFER2_SIZE * 0.999621916911, CHAMFER2_SIZE * 0.0274958766106), (-CHAMFER2_SIZE * 0.0274958766106, CHAMFER2_SIZE * 0.999621916911), (0, 0), align=None)
    chamfer2_piece_15a = extrude(amount=17.85841494, mode=Mode.PRIVATE)
    chamfer2_piece_15a = split(chamfer2_piece_15a, bisect_by=Plane(origin=(39.724331863, 68.346721886, 16.927119168), z_dir=(0.3420201433256728, -0.9396926207859069, 0)), keep=Keep.TOP, mode=Mode.PRIVATE)
    chamfer2_piece_15a = split(chamfer2_piece_15a, bisect_by=Plane(origin=(34.538888643, 63.795864954, 16.927119168), z_dir=(0.9396926207859069, 0.3420201433256728, 0)), keep=Keep.TOP, mode=Mode.PRIVATE)
    with BuildSketch(Plane(origin=(35.050933619, 62.389032943, 23.65571123), x_dir=(0.9487414825566265, 0.3160531589404771, 0), z_dir=(0, 0, -1))) as chamfer2_piece_15b_section:
        Polygon((CHAMFER2_SIZE * 0.999621916911, -CHAMFER2_SIZE * 0.0274958766106), (-CHAMFER2_SIZE * 0.0274958766106, -CHAMFER2_SIZE * 0.999621916911), (0, 0), align=None)
    chamfer2_piece_15b = extrude(amount=17.85841494, mode=Mode.PRIVATE)
    chamfer2_piece_15b = split(chamfer2_piece_15b, bisect_by=Plane(origin=(36.163233847, 64.387078259, 18.65571123), z_dir=(0, 0, -1)), keep=Keep.TOP, mode=Mode.PRIVATE)
    chamfer2_piece_15b = split(chamfer2_piece_15b, bisect_by=Plane(origin=(35.307198251, 66.73901673, 12.22650376), z_dir=(0.3420201433256728, -0.9396926207859069, 0)), keep=Keep.TOP, mode=Mode.PRIVATE)
    chamfer2_piece_15 = chamfer2_piece_15a & chamfer2_piece_15b
    add(chamfer2_piece_15)
    with BuildSketch(Plane(origin=(30.352470516, 60.678932226, 41.34428877), x_dir=(0.009404143659219547, -0.025837672353012715, 0.9996219169112965), z_dir=(0.9396926207859069, 0.3420201433256728, 0))) as chamfer2_piece_16a_section:
        Polygon((CHAMFER2_SIZE * 0.999621916911, -CHAMFER2_SIZE * 0.0274958766106), (-CHAMFER2_SIZE * 0.0274958766106, -CHAMFER2_SIZE * 0.999621916911), (0, 0), align=None)
    chamfer2_piece_16a = extrude(amount=17.85841494, mode=Mode.PRIVATE)
    chamfer2_piece_16a = split(chamfer2_piece_16a, bisect_by=Plane(origin=(39.724331863, 68.346721886, 43.072880832), z_dir=(0.3420201433256728, -0.9396926207859069, 1.4210854715202e-15)), keep=Keep.TOP, mode=Mode.PRIVATE)
    chamfer2_piece_16a = split(chamfer2_piece_16a, bisect_by=Plane(origin=(34.538888643, 63.795864954, 43.072880832), z_dir=(0.9396926207859069, 0.3420201433256728, 0)), keep=Keep.TOP, mode=Mode.PRIVATE)
    with BuildSketch(Plane(origin=(35.050933619, 62.389032943, 54.20270371), x_dir=(0.9487414825566265, 0.3160531589404771, 0), z_dir=(0, 0, -1))) as chamfer2_piece_16b_section:
        Polygon((CHAMFER2_SIZE * 0.999621916911, -CHAMFER2_SIZE * 0.0274958766106), (-CHAMFER2_SIZE * 0.0274958766106, -CHAMFER2_SIZE * 0.999621916911), (0, 0), align=None)
    chamfer2_piece_16b = extrude(amount=17.85841494, mode=Mode.PRIVATE)
    chamfer2_piece_16b = split(chamfer2_piece_16b, bisect_by=Plane(origin=(35.307198251, 66.73901673, 47.77349624), z_dir=(0.3420201433256728, -0.9396926207859069, 0)), keep=Keep.TOP, mode=Mode.PRIVATE)
    chamfer2_piece_16b = split(chamfer2_piece_16b, bisect_by=Plane(origin=(36.163233847, 64.387078259, 41.34428877), z_dir=(0, 0, 1)), keep=Keep.TOP, mode=Mode.PRIVATE)
    chamfer2_piece_16 = chamfer2_piece_16a & chamfer2_piece_16b
    add(chamfer2_piece_16)


solid = part.part
